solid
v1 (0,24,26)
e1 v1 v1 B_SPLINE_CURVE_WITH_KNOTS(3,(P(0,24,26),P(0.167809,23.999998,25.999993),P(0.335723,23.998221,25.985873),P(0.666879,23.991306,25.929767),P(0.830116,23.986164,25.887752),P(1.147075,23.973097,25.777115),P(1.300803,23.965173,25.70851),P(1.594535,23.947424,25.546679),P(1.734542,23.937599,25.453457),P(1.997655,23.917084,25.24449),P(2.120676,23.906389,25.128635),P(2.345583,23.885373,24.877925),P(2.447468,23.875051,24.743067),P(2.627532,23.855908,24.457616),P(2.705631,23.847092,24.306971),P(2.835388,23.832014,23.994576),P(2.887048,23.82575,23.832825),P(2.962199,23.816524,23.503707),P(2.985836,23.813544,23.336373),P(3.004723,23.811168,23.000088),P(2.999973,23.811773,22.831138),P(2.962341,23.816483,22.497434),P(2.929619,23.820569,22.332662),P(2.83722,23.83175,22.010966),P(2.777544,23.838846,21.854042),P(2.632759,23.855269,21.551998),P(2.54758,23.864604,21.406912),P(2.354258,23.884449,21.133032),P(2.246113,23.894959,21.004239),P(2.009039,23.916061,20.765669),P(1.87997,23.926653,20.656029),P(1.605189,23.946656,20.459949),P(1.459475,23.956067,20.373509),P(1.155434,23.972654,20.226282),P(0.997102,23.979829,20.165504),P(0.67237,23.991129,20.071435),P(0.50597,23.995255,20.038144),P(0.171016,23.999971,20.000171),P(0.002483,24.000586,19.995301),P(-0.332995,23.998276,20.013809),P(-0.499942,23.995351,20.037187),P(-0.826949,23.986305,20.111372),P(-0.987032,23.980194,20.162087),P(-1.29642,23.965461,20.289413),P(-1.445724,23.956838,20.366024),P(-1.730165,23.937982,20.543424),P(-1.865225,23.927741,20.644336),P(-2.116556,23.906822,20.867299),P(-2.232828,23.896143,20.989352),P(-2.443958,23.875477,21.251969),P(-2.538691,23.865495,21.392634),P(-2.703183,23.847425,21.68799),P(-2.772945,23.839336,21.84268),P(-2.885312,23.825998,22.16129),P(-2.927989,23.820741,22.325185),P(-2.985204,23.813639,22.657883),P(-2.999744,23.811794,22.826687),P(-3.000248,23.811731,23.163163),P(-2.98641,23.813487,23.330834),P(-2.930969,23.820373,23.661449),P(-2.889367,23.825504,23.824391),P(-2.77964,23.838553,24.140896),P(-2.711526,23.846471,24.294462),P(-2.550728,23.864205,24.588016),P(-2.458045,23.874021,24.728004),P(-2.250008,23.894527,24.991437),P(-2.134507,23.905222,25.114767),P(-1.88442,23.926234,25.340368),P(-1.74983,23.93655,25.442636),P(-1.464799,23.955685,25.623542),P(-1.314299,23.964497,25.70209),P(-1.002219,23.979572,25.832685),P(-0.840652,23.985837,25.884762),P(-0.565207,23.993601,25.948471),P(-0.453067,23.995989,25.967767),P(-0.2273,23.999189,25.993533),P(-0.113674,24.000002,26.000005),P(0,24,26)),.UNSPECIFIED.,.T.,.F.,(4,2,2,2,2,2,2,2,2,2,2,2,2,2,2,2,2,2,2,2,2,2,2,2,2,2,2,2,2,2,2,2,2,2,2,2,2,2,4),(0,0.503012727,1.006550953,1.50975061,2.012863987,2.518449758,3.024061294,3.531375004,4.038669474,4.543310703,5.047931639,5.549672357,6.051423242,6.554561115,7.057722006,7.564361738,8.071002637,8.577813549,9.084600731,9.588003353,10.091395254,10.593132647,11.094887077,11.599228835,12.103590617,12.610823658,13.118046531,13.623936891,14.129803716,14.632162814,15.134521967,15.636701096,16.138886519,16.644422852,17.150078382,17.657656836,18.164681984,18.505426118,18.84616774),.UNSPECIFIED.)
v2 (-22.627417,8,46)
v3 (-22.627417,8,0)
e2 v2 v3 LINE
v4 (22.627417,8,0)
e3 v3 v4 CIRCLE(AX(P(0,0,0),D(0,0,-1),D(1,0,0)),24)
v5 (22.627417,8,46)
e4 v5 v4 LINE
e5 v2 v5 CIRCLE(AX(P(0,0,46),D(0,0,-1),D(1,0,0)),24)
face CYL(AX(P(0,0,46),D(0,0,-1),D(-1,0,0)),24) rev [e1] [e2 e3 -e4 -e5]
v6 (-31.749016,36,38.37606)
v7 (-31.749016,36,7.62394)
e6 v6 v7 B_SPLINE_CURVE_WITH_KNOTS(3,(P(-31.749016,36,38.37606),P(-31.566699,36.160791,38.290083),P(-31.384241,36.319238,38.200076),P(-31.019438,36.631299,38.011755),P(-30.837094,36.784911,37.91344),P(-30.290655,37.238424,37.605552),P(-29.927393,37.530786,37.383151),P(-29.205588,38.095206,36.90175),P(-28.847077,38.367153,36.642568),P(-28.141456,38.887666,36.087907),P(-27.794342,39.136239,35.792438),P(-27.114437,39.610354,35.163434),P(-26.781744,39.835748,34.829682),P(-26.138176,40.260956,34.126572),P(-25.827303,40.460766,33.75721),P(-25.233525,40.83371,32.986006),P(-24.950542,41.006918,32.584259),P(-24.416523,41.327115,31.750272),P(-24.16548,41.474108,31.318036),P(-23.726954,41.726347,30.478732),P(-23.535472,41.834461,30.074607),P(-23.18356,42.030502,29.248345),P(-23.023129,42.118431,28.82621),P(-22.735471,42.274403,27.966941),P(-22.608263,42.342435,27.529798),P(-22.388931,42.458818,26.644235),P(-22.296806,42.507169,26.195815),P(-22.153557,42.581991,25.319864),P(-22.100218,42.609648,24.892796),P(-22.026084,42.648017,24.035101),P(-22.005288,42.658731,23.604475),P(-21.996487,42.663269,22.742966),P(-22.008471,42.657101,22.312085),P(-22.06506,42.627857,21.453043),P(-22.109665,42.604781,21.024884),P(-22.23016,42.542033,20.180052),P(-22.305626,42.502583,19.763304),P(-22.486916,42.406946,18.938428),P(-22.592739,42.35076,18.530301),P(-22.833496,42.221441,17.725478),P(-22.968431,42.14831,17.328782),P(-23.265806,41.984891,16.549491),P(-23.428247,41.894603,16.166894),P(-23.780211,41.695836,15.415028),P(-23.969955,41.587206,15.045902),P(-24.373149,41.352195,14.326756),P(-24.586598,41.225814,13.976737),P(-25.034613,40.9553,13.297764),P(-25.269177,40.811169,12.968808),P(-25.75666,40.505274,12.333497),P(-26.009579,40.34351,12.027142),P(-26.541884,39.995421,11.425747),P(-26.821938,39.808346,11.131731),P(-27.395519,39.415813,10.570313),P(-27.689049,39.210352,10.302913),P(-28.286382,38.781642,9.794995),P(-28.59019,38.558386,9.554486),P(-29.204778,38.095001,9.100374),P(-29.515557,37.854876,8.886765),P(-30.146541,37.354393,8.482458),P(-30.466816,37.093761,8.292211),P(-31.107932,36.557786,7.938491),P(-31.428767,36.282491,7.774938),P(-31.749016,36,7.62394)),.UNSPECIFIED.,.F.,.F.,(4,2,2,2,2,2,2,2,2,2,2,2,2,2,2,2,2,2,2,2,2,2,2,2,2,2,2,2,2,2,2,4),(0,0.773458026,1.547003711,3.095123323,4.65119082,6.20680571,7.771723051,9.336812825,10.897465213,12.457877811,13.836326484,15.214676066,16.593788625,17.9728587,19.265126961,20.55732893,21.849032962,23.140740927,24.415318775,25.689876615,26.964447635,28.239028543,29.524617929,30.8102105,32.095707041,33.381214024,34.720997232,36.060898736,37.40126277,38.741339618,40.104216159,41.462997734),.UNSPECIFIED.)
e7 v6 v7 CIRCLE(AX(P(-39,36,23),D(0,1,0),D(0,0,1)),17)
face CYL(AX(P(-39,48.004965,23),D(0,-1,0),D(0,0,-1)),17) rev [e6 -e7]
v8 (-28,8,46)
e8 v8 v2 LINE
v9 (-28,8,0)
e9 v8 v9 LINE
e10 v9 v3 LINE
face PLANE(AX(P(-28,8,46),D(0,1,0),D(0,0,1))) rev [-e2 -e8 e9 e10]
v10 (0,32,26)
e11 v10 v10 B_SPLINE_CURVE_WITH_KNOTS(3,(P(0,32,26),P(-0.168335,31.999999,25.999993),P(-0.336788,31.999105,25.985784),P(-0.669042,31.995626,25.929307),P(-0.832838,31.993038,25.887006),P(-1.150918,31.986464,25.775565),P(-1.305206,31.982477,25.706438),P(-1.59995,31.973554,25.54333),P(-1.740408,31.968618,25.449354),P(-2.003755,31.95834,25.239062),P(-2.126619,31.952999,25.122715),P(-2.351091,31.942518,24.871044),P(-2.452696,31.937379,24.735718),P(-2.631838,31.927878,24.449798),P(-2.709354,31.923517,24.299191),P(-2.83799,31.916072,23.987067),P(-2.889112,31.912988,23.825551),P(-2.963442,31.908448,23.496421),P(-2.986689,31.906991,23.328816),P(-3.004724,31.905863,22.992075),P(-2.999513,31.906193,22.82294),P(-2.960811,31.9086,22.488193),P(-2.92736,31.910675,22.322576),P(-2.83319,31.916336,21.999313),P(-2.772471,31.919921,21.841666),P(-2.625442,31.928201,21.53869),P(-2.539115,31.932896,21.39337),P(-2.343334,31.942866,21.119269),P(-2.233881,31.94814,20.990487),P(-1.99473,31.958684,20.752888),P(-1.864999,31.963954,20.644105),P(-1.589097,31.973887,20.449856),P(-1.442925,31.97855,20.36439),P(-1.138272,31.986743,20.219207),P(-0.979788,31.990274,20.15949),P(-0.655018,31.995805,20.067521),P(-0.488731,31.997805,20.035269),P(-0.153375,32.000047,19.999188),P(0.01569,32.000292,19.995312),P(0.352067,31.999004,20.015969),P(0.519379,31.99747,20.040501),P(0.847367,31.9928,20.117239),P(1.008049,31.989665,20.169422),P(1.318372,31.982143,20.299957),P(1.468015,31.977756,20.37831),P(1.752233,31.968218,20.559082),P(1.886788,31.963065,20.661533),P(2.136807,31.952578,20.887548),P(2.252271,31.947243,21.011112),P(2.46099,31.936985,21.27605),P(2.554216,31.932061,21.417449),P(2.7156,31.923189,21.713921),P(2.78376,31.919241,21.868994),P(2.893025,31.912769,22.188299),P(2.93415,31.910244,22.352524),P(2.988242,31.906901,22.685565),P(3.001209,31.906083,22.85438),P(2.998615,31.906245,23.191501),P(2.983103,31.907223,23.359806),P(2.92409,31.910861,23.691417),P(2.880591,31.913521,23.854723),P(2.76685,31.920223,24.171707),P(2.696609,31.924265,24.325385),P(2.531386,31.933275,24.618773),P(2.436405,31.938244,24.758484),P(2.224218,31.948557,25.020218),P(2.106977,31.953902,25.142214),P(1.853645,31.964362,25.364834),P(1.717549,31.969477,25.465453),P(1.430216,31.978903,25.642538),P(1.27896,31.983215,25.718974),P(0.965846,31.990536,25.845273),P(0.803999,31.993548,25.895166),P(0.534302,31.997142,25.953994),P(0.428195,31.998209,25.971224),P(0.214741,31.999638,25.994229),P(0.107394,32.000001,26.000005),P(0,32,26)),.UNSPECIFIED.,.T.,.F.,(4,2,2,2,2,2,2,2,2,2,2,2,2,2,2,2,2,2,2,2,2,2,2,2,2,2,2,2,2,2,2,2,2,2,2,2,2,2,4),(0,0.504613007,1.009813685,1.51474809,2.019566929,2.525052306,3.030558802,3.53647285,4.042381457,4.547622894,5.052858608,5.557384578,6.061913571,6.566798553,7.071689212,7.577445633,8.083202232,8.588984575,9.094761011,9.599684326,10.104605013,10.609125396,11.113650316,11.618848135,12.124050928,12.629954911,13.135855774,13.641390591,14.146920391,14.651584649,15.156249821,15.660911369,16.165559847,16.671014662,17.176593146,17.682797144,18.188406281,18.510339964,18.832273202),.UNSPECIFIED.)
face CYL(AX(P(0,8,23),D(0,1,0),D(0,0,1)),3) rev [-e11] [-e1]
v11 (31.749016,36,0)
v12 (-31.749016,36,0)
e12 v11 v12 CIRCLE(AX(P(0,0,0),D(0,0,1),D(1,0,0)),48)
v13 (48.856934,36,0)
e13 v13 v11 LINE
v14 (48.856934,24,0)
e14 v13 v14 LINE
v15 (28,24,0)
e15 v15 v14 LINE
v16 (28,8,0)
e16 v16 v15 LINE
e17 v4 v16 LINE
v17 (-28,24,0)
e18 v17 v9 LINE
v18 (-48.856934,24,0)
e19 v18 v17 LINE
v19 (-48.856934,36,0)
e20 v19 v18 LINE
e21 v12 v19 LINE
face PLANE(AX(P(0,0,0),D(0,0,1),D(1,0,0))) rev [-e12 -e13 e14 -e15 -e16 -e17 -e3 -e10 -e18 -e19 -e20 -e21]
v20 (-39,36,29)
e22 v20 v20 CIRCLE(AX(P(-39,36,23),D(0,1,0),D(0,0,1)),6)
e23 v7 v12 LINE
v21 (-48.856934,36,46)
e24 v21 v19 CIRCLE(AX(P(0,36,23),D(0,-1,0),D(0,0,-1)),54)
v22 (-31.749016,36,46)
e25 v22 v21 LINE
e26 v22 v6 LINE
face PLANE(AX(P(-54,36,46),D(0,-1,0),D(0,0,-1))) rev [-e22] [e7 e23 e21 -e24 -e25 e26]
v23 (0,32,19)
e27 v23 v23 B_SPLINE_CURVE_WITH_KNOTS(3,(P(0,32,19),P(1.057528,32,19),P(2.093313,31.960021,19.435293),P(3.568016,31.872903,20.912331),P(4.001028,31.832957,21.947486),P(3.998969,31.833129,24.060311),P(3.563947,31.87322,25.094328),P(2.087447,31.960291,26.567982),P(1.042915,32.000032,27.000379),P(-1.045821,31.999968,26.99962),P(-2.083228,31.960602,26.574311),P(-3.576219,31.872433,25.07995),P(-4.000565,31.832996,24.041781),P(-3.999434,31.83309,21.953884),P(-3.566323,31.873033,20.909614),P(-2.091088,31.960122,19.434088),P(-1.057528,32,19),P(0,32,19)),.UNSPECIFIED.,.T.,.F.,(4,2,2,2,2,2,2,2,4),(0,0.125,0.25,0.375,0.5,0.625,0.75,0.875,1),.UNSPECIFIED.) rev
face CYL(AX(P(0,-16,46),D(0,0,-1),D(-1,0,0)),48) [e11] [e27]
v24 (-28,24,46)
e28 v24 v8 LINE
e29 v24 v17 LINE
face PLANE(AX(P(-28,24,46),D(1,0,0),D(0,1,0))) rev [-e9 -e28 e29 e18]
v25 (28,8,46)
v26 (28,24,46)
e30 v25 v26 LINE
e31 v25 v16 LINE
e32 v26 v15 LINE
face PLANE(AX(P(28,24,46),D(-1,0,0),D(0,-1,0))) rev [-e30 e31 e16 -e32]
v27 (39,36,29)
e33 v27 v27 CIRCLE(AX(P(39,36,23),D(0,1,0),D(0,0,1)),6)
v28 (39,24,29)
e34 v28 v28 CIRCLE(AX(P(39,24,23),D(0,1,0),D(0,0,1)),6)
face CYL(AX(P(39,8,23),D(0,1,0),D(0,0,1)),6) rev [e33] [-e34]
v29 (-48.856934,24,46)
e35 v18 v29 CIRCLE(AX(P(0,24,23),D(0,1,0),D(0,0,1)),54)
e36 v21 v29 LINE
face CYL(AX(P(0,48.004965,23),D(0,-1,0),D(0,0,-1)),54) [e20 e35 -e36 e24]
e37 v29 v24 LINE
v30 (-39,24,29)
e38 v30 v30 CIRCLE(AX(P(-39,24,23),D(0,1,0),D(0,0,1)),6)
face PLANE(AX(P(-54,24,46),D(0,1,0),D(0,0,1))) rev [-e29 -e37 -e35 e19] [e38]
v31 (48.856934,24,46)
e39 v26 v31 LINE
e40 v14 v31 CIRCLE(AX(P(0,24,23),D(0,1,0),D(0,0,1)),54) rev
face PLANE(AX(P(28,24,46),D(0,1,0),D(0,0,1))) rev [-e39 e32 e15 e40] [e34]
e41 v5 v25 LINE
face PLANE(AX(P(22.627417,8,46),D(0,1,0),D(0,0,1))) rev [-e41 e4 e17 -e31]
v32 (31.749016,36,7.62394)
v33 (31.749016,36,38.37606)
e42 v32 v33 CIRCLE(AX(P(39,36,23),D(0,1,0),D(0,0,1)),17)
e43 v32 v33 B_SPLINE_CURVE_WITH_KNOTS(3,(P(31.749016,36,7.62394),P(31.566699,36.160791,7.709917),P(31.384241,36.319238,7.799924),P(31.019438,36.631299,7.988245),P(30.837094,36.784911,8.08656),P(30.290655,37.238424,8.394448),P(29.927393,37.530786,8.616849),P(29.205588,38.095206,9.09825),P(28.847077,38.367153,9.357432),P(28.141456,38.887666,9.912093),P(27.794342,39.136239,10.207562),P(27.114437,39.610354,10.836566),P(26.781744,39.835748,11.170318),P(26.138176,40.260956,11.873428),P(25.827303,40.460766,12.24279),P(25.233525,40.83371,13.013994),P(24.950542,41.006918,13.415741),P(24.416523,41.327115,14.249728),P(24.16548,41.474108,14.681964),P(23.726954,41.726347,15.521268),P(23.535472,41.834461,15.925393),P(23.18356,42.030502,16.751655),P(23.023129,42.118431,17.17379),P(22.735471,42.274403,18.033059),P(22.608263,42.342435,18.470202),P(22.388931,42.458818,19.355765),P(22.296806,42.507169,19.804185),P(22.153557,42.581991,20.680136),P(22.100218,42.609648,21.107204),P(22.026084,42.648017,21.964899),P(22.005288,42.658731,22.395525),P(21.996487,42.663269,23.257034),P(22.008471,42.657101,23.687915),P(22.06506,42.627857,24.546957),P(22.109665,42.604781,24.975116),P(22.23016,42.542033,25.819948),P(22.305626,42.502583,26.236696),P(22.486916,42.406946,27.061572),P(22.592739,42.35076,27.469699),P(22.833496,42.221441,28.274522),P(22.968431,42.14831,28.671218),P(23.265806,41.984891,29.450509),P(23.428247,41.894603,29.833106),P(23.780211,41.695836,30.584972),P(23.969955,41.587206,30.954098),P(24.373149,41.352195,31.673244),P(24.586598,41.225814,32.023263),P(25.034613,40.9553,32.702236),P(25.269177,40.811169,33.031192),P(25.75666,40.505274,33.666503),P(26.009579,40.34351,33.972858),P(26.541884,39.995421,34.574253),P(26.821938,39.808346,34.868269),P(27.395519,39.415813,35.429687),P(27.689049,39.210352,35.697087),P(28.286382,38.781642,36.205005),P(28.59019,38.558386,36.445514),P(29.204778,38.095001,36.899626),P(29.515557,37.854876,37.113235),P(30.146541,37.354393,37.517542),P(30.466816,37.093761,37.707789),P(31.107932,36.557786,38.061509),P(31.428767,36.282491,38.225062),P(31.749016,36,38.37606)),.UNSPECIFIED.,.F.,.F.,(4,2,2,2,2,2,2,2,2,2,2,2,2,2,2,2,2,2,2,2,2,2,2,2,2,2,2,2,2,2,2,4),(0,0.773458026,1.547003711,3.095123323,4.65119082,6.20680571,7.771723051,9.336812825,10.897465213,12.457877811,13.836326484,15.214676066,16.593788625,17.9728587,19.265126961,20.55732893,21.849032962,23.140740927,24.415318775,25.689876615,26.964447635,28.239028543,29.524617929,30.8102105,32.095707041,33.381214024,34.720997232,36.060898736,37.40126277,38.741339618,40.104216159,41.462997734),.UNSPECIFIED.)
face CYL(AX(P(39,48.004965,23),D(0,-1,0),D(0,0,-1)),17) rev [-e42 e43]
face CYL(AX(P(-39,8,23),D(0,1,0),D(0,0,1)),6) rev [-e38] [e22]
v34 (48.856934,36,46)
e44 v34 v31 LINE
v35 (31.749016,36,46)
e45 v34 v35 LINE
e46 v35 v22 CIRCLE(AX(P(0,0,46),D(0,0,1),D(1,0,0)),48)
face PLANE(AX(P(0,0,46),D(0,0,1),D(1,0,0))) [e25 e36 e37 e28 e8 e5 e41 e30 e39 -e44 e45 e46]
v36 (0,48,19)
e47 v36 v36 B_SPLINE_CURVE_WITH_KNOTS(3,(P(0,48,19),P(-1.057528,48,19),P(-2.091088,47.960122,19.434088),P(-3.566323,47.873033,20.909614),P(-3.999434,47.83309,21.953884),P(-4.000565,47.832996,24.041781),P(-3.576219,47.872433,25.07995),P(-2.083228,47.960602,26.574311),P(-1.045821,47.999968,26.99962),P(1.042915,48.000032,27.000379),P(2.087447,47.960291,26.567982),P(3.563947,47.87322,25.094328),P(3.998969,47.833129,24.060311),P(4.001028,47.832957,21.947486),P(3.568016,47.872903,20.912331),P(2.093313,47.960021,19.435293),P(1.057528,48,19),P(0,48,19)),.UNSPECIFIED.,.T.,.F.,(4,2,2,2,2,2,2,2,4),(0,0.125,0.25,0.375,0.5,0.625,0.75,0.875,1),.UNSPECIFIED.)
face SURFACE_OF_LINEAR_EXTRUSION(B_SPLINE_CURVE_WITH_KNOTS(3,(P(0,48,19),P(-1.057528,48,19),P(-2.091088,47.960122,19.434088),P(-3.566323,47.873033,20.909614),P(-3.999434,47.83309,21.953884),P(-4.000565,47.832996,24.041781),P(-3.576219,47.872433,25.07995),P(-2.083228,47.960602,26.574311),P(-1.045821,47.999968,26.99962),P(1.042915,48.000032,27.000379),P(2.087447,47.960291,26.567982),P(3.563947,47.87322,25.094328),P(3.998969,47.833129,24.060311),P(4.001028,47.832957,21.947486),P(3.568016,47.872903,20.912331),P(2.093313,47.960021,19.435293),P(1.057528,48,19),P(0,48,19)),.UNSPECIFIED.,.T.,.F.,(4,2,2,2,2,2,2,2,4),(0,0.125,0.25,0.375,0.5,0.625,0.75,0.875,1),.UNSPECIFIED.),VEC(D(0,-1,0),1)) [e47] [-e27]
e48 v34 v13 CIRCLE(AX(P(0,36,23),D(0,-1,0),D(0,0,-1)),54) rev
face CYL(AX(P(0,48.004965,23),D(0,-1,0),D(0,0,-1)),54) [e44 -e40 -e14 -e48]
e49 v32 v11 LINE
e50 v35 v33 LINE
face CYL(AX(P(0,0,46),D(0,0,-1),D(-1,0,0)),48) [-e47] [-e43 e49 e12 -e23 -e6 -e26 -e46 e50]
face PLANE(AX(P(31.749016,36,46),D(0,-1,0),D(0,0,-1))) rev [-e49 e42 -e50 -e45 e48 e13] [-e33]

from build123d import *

# Parameters (mm, degrees)
BOSS_EXTRUDE1_DEPTH  = 46
CUT_EXTRUDE1_START   = -4.166957121
CUT_EXTRUDE1_DEPTH   = 17.166957121
CUT_EXTRUDE1_START_2 = 18
CUT_EXTRUDE1_2_DEPTH = 10
SKETCH4_R            = 3
CUT_EXTRUDE2_DEPTH   = 77.26270392
SKETCH5_R            = 17
CUT_EXTRUDE3_DEPTH   = 77.262703957
SKETCH6_R            = 6
CUT_EXTRUDE4_DEPTH   = 77.262703957
CUT_EXTRUDE5_DEPTH   = 86.650452531


with BuildPart() as part:
    # Sketch1 → Boss-Extrude1 (new body)
    with BuildSketch(Plane.XY):
        with BuildLine():
            Line((-28, 8), (-22.627416998, 8))
            ThreePointArc((-22.627416998, 8), (0, 24), (22.627416998, 8))
            Line((22.627416998, 8), (28, 8))
            Line((28, 8), (28, 24))
            Line((28, 24), (54, 24))
            Line((54, 24), (54, 36))
            Line((54, 36), (31.749015733, 36))
            ThreePointArc((31.749015733, 36), (0, 48), (-31.749015733, 36))
            Line((-31.749015733, 36), (-54, 36))
            Line((-54, 36), (-54, 24))
            Line((-54, 24), (-28, 24))
            Line((-28, 24), (-28, 8))
        make_face()
    extrude(amount=BOSS_EXTRUDE1_DEPTH)

    # Cut-Extrude1: read off the stored shape, not the designer's step
    # Cut-Extrude1 outline → Cut-Extrude1 (cut)
    with BuildSketch(Plane(origin=(0, 36, 0), x_dir=(1, 0, 0), z_dir=(0, 1, 0)).offset(CUT_EXTRUDE1_START)):
        with BuildLine():
            add(Edge.make_bspline(
                [(0, -19), (-1.057527997, -19), (-2.091087742, -19.434088276), (-3.566323367, -20.909614388), (-3.999433765, -21.953884044), (-4.00056506, -24.04178128), (-3.576219278, -25.07994956), (-2.083227921, -26.574310552), (-1.045821073, -26.9996204), (1.042915307, -27.000379072), (2.087446575, -26.567981834), (3.563947107, -25.094327717), (3.998968512, -24.060310778), (4.001027689, -21.947486084), (3.568016054, -20.912331491), (2.093312914, -19.435292521), (1.057527997, -19), (0, -19)],
                knots=[0, 0, 0, 0, 0.125, 0.125, 0.25, 0.25, 0.375, 0.375, 0.5, 0.5, 0.625, 0.625, 0.75, 0.75, 0.875, 0.875, 1, 1, 1, 1], degree=3))
        make_face()
    extrude(amount=CUT_EXTRUDE1_DEPTH, mode=Mode.SUBTRACT)

    # Cut-Extrude1 2 outline → Cut-Extrude1 2 (add)
    with BuildSketch(Plane.XY.offset(CUT_EXTRUDE1_START_2)):
        with BuildLine():
            ThreePointArc((4.00000004, 31.83304297), (-2.3e-08, 32), (-4.000000085, 31.833042966))
            Line((-4.000000085, 31.833042966), (4.00000004, 31.83304297))
        make_face()
    extrude(amount=CUT_EXTRUDE1_2_DEPTH)

    # Sketch4 → Cut-Extrude2 (cut, through all)
    with BuildSketch(Plane(origin=(0, 36, 0), x_dir=(1, 0, 0), z_dir=(0, 1, 0))):
        with Locations(Location((0, -23, 0), (0, 0, 270))):
            Circle(SKETCH4_R)
    extrude(amount=-CUT_EXTRUDE2_DEPTH, mode=Mode.SUBTRACT)

    # Sketch5 → Cut-Extrude3 (cut, through all)
    with BuildSketch(Plane(origin=(0, 36, 0), x_dir=(1, 0, 0), z_dir=(0, 1, 0))):
        with Locations((-39, -23)):
            Circle(SKETCH5_R)
        with Locations((39, -23)):
            Circle(SKETCH5_R)
    extrude(amount=CUT_EXTRUDE3_DEPTH, mode=Mode.SUBTRACT)

    # Sketch6 → Cut-Extrude4 (cut, through all)
    with BuildSketch(Plane(origin=(0, 36, 0), x_dir=(1, 0, 0), z_dir=(0, 1, 0))):
        with Locations(Location((-39, -23, 0), (0, 0, 270))):
            Circle(SKETCH6_R)
        with Locations(Location((39, -23, 0), (0, 0, 270))):
            Circle(SKETCH6_R)
    extrude(amount=-CUT_EXTRUDE4_DEPTH, mode=Mode.SUBTRACT)

    # Sketch8 → Cut-Extrude5 (cut, through all)
    with BuildSketch(Plane(origin=(0, 0, 0), x_dir=(1, 0, 0), z_dir=(0, 1, 0))):
        with BuildLine():
            Line((-48.61841215, -46.5), (-63.61841215, -46.5))
            Line((-63.61841215, -46.5), (-63.61841215, 0.5))
            Line((-63.61841215, 0.5), (-48.61841215, 0.5))
            ThreePointArc((-48.61841215, 0.5), (-54, -23), (-48.61841215, -46.5))
        make_face()
    cut_extrude5 = extrude(amount=CUT_EXTRUDE5_DEPTH, mode=Mode.SUBTRACT)

    # Mirror1: Cut-Extrude5 across plane
    add(cut_extrude5.mirror(Plane(origin=(0, 0, 0), x_dir=(0, 0, 1), z_dir=(1, 0, 0))), mode=Mode.SUBTRACT)


solid = part.part
